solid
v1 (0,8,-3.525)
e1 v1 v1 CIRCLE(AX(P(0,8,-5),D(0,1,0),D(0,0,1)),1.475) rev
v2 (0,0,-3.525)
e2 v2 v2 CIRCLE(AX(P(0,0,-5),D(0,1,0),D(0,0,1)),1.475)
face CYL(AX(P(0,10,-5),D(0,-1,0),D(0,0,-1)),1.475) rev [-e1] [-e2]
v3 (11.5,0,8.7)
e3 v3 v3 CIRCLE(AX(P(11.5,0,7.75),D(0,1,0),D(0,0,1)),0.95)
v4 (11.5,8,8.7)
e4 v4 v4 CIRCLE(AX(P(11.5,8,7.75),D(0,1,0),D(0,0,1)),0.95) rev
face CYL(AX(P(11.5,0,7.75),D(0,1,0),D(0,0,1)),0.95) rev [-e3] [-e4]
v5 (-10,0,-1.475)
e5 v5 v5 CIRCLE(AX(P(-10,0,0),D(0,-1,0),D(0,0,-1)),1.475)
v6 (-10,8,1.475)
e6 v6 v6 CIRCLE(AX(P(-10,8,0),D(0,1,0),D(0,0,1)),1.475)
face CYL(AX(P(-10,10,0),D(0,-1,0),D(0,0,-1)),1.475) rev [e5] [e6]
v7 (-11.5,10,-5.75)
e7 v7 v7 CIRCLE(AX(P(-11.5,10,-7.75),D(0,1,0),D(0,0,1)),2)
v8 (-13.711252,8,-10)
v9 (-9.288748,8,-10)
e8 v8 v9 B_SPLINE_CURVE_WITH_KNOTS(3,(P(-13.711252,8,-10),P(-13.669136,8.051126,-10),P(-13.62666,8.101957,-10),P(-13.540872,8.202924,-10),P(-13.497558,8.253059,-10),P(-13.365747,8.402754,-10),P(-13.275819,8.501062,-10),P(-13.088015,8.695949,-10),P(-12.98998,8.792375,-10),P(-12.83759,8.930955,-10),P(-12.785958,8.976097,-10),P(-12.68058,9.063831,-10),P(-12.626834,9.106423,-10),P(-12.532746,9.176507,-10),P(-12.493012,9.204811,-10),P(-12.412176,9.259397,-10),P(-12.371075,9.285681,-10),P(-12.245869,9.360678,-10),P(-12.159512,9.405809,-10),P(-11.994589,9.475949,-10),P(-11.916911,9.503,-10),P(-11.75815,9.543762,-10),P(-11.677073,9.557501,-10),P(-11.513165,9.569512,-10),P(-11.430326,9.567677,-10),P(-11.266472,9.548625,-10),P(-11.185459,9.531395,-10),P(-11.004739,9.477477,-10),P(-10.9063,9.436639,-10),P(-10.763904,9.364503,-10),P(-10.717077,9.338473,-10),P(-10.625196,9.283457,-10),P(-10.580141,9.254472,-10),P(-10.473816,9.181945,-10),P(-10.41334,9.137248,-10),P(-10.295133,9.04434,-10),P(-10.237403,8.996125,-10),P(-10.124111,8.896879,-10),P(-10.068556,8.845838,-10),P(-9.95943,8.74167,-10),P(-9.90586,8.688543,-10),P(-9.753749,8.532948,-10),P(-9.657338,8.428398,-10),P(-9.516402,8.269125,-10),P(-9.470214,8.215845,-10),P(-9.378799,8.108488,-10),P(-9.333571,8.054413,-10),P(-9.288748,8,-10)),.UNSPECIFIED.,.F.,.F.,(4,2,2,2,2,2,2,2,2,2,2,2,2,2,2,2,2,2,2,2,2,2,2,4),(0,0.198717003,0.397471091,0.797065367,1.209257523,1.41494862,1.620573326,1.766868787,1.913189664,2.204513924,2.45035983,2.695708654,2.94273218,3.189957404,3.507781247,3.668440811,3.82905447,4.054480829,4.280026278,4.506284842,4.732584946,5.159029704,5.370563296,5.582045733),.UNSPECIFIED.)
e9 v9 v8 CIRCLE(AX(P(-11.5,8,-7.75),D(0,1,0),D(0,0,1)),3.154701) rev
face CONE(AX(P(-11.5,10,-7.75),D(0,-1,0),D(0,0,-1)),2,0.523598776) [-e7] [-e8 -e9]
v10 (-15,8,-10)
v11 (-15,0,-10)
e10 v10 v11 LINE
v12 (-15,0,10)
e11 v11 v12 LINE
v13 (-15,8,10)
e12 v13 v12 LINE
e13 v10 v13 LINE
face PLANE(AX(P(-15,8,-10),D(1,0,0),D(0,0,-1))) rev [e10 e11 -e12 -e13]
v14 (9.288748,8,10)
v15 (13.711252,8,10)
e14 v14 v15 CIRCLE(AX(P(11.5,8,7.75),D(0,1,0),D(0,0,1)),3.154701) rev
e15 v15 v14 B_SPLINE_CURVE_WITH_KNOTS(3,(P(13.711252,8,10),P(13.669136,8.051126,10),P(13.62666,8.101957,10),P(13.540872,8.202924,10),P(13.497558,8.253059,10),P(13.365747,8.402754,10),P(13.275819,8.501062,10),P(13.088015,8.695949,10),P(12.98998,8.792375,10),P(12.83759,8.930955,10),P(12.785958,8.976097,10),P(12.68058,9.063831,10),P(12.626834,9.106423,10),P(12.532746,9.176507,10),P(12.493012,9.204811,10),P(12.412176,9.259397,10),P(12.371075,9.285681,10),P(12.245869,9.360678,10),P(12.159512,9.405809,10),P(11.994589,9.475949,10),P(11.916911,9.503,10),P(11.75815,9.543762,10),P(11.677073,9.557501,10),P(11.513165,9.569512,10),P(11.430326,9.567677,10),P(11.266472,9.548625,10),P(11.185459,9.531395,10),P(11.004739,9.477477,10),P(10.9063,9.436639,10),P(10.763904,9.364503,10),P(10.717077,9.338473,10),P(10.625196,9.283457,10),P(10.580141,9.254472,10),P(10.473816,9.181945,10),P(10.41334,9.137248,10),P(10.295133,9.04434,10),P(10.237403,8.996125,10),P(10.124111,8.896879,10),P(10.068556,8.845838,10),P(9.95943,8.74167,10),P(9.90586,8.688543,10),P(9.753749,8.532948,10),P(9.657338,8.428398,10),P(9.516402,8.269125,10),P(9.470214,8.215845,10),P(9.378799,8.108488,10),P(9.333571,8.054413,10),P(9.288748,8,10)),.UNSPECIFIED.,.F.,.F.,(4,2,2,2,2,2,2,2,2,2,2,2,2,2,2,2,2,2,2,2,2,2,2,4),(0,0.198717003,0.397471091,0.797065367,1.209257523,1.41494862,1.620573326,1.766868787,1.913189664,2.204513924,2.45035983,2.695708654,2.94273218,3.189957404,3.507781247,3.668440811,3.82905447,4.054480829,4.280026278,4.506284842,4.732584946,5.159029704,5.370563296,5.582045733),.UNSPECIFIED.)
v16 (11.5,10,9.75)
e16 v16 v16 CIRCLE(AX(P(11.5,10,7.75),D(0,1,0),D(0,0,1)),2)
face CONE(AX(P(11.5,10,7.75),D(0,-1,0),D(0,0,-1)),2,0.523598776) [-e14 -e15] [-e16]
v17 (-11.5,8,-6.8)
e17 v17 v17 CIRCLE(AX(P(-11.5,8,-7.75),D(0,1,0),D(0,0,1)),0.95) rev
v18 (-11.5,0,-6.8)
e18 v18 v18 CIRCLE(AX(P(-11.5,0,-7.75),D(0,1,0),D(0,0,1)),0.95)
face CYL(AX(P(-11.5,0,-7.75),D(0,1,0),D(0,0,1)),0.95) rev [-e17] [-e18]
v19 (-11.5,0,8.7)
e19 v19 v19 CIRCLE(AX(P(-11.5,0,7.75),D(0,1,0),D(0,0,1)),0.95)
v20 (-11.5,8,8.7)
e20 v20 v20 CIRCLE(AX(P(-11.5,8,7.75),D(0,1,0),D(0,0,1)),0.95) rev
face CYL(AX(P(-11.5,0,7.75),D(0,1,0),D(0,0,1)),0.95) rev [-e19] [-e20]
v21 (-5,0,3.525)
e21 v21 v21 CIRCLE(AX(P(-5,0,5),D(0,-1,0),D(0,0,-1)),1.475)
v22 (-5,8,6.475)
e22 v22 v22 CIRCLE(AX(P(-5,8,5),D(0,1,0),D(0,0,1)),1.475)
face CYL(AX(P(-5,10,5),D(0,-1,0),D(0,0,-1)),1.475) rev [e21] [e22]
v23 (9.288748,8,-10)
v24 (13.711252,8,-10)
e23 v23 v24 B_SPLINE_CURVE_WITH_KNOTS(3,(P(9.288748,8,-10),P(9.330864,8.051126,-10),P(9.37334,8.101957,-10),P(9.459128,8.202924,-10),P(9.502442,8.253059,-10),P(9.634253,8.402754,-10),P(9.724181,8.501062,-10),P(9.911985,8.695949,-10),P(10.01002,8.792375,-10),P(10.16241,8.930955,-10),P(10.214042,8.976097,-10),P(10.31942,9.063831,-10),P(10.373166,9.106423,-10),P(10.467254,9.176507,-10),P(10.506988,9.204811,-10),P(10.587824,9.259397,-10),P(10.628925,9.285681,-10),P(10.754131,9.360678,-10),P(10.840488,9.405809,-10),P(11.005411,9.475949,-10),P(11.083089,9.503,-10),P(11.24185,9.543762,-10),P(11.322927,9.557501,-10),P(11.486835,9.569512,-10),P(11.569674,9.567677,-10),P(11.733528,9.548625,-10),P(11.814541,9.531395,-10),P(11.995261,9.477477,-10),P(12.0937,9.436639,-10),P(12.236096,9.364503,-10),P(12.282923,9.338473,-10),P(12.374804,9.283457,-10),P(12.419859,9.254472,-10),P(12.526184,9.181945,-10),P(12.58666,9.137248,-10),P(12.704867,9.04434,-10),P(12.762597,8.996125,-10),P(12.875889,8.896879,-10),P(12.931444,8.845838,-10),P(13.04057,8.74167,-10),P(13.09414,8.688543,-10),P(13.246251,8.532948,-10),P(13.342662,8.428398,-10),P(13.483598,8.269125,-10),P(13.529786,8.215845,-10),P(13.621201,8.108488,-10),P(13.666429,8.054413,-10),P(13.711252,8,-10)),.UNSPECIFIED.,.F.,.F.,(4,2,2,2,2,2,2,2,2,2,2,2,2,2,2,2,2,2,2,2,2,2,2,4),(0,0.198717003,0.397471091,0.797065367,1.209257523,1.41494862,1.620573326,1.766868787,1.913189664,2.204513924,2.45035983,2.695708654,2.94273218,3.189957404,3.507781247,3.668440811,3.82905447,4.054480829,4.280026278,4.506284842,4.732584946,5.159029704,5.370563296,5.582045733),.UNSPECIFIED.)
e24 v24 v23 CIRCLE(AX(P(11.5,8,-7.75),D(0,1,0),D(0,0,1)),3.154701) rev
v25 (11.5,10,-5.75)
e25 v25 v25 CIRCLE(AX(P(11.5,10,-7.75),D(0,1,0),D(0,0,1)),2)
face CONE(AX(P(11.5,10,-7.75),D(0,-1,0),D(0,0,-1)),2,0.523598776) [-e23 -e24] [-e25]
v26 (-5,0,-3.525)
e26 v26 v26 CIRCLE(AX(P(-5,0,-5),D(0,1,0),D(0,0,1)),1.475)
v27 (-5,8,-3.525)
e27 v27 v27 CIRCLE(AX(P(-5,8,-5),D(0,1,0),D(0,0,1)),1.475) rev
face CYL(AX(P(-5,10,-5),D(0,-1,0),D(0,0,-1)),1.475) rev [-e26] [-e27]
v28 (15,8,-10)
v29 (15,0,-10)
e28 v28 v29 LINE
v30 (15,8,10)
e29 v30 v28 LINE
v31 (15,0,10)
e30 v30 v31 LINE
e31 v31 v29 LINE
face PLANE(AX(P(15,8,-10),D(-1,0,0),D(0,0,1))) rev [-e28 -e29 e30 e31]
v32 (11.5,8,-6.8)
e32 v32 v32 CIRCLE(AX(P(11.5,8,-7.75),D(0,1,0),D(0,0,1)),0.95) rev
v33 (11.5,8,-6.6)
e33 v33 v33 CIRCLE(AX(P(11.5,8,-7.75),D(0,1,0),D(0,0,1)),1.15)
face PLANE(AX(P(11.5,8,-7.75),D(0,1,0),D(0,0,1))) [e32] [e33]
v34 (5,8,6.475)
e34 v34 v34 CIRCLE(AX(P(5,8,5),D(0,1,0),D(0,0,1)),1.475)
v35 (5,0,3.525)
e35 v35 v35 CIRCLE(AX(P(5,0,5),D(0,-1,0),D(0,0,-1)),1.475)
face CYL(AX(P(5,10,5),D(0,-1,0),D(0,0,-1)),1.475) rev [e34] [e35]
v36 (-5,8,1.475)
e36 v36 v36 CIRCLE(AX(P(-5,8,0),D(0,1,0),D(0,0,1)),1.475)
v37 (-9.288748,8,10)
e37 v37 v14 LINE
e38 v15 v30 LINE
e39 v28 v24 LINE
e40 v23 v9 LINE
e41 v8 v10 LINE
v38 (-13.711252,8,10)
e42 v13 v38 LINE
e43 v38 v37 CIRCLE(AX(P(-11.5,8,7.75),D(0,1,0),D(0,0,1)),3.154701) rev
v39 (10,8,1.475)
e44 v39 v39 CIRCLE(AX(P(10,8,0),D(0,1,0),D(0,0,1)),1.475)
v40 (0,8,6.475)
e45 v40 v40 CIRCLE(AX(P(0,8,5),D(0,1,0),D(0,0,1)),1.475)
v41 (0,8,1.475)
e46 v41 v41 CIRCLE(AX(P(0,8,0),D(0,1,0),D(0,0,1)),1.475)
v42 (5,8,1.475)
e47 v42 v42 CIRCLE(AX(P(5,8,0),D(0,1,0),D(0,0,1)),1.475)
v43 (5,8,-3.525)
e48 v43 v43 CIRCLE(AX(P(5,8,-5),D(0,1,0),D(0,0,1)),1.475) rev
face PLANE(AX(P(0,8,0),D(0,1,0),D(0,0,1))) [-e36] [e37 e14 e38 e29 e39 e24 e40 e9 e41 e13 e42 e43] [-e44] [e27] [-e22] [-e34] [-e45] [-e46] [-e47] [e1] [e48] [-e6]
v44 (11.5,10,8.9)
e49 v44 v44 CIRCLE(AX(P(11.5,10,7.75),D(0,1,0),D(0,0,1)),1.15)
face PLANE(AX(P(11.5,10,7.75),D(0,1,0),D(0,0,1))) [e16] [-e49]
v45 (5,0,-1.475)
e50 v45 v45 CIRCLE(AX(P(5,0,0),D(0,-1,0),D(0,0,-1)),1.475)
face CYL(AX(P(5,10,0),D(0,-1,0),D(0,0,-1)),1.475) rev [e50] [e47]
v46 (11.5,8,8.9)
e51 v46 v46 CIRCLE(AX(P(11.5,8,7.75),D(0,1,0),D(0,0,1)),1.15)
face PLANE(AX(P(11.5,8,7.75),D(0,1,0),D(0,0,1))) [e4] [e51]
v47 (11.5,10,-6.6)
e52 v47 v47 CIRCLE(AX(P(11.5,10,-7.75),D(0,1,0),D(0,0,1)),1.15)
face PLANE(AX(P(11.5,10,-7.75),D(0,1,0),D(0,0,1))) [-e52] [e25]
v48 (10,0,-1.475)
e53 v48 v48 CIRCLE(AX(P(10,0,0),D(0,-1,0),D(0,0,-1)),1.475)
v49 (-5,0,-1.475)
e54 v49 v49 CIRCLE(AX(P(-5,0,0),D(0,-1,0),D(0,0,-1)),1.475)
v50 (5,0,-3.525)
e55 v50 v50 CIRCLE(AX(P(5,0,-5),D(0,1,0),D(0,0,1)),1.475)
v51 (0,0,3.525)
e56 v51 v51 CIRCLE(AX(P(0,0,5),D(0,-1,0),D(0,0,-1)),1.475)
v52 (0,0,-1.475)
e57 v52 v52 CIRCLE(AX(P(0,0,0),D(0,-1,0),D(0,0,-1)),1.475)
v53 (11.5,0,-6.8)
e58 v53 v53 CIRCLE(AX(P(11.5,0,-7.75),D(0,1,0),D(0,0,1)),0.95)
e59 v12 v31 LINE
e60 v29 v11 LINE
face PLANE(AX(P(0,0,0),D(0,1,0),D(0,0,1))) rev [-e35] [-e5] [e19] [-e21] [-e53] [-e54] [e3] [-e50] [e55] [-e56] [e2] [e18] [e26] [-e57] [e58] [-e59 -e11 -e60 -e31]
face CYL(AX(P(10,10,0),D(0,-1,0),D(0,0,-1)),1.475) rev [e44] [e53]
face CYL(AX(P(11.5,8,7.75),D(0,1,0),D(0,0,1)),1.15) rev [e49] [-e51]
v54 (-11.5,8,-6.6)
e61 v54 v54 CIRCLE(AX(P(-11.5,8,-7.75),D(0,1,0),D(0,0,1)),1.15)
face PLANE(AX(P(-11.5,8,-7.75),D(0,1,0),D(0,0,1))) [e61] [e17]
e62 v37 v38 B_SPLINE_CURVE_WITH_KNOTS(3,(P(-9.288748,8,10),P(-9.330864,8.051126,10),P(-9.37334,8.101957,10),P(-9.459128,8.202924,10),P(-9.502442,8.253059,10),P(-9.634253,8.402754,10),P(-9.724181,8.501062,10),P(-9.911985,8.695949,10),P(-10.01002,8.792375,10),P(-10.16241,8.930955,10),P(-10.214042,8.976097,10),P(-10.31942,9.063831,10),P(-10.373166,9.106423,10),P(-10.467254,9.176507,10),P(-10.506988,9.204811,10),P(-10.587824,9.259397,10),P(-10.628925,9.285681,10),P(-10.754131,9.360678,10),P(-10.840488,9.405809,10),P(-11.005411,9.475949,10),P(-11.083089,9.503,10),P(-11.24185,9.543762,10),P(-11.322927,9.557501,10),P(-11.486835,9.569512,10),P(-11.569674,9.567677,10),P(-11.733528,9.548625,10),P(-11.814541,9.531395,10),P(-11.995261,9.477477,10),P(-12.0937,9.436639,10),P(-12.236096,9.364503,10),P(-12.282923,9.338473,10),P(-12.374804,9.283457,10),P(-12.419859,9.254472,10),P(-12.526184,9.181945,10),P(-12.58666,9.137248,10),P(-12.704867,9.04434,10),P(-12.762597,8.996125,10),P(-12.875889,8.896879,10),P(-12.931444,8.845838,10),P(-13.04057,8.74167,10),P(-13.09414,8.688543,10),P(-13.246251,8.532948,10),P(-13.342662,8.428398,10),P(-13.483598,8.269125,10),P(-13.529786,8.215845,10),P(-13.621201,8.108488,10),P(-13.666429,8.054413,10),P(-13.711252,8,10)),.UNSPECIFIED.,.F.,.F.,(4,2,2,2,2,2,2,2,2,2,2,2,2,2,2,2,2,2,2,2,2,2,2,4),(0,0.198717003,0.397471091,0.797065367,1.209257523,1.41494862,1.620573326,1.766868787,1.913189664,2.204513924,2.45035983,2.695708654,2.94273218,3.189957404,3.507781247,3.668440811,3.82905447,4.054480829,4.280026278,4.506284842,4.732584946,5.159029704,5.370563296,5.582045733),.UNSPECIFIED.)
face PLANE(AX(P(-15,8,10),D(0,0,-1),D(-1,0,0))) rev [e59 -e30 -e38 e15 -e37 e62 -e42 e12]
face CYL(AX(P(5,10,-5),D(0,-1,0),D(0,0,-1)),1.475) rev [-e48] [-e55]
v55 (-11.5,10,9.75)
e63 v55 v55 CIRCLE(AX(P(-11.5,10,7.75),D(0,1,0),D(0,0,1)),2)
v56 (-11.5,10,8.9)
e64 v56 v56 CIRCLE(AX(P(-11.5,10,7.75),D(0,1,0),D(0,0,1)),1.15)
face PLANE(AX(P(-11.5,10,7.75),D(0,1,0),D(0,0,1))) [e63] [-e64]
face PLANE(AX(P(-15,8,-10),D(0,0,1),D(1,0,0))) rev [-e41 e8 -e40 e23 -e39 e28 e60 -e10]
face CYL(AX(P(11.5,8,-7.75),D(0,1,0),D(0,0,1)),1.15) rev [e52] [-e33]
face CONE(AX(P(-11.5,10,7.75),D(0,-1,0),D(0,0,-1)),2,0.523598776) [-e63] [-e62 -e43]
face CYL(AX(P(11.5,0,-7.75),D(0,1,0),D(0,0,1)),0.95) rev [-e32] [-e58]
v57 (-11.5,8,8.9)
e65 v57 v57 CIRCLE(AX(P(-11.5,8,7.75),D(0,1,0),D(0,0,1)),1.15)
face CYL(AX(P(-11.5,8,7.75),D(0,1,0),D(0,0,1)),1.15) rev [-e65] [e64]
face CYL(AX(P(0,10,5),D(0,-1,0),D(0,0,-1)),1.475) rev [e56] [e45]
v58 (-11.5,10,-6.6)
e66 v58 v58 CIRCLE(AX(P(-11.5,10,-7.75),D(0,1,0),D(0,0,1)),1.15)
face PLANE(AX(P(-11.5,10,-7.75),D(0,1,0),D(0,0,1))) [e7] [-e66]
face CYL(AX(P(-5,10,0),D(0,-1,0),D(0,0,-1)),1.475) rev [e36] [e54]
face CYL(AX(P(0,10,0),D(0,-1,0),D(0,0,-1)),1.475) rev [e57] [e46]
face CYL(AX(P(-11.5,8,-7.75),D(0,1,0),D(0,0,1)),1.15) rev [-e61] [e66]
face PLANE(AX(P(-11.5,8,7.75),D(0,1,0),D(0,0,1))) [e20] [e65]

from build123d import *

# Parameters (mm, degrees)
SKETCH1_W               = 30
SKETCH1_H               = 20
BOSS_EXTRUDE1_DEPTH     = 8
SKETCH2_R               = 0.95
CUT_EXTRUDE1_DEPTH      = 20.723082923
BOSS_EXTRUDE2_START     = 2
SKETCH3_R               = 2
SKETCH3_R_2             = 0.95
BOSS_EXTRUDE2_DEPTH     = 2
CHAMFER1_SIZE           = 1.154700538
CHAMFER1_SIZE_2         = 2
SKETCH4_R               = 1.475
CUT_EXTRUDE2_DEPTH      = 21.615528128
LPATTERN1_COUNT         = 5
LPATTERN1_PITCH         = 5
LPATTERN1_COUNT_DIR2    = 2
LPATTERN1_PITCH_DIR2    = 5
MIRROR1_COPY_1_SKETCH_R = 1.475
MIRROR1_COPY_1_DEPTH    = 21.615528128
MIRROR1_COPY_2_SKETCH_R = 1.475
MIRROR1_COPY_2_DEPTH    = 21.615528128
MIRROR1_COPY_3_SKETCH_R = 1.475
MIRROR1_COPY_3_DEPTH    = 21.615528128
MIRROR1_COPY_4_SKETCH_R = 1.475
MIRROR1_COPY_4_DEPTH    = 21.615528128
MIRROR1_COPY_5_SKETCH_R = 1.475
MIRROR1_COPY_5_DEPTH    = 21.615528128
MIRROR1_COPY_6_SKETCH_R = 1.475
MIRROR1_COPY_6_DEPTH    = 21.615528128
MIRROR1_COPY_7_SKETCH_R = 1.475
MIRROR1_COPY_7_DEPTH    = 21.615528128
MIRROR1_COPY_8_SKETCH_R = 1.475
MIRROR1_COPY_8_DEPTH    = 21.615528128
SKETCH5_R               = 1.15
CUT_EXTRUDE3_DEPTH      = 2


with BuildPart() as part:
    # Sketch1 → Boss-Extrude1 (new body)
    with BuildSketch(Plane(origin=(0, 0, 0), x_dir=(1, 0, 0), z_dir=(0, 1, 0))):
        Rectangle(SKETCH1_W, SKETCH1_H)
    extrude(amount=BOSS_EXTRUDE1_DEPTH)

    # Sketch2 → Cut-Extrude1 (cut, through all)
    with BuildSketch(Plane(origin=(0, 8, 0), x_dir=(1, 0, 0), z_dir=(0, 1, 0))):
        with Locations(Location((-11.5, 7.75, 0), (0, 0, 270))):
            Circle(SKETCH2_R)
        with Locations(Location((-11.5, -7.75, 0), (0, 0, 270))):
            Circle(SKETCH2_R)
        with Locations(Location((11.5, -7.75, 0), (0, 0, 270))):
            Circle(SKETCH2_R)
        with Locations(Location((11.5, 7.75, 0), (0, 0, 270))):
            Circle(SKETCH2_R)
    extrude(amount=-CUT_EXTRUDE1_DEPTH, mode=Mode.SUBTRACT)

    # Sketch3 → Boss-Extrude2 (add)
    # profile 1 of 4: a face of its own
    with BuildSketch(Plane(origin=(0, 8, 0), x_dir=(1, 0, 0), z_dir=(0, 1, 0)).offset(BOSS_EXTRUDE2_START)):
        with Locations(Location((-11.5, -7.75, 0), (0, 0, 270))):
            Circle(SKETCH3_R)
        with Locations(Location((-11.5, -7.75, 0), (0, 0, 270))):
            Circle(SKETCH3_R_2, mode=Mode.SUBTRACT)
    # profile 2 of 4: a face of its own
    with BuildSketch(Plane(origin=(0, 8, 0), x_dir=(1, 0, 0), z_dir=(0, 1, 0)).offset(BOSS_EXTRUDE2_START)):
        with Locations(Location((-11.5, 7.75, 0), (0, 0, 270))):
            Circle(SKETCH3_R)
        with Locations(Location((-11.5, 7.75, 0), (0, 0, 270))):
            Circle(SKETCH3_R_2, mode=Mode.SUBTRACT)
    # profile 3 of 4: a face of its own
    with BuildSketch(Plane(origin=(0, 8, 0), x_dir=(1, 0, 0), z_dir=(0, 1, 0)).offset(BOSS_EXTRUDE2_START)):
        with Locations(Location((11.5, 7.75, 0), (0, 0, 270))):
            Circle(SKETCH3_R)
        with Locations(Location((11.5, 7.75, 0), (0, 0, 270))):
            Circle(SKETCH3_R_2, mode=Mode.SUBTRACT)
    # profile 4 of 4: a face of its own
    with BuildSketch(Plane(origin=(0, 8, 0), x_dir=(1, 0, 0), z_dir=(0, 1, 0)).offset(BOSS_EXTRUDE2_START)):
        with Locations(Location((11.5, -7.75, 0), (0, 0, 270))):
            Circle(SKETCH3_R)
        with Locations(Location((11.5, -7.75, 0), (0, 0, 270))):
            Circle(SKETCH3_R_2, mode=Mode.SUBTRACT)
    extrude(amount=-BOSS_EXTRUDE2_DEPTH)

    # Chamfer1
    # the kernel refuses this chamfer: 2, 1.154700538 mm, written as the material it adds along each edge
    with BuildSketch(Plane(origin=(11.5, 8, -7.75), x_dir=(0, 0, 1), z_dir=(-1, 0, 0))) as chamfer1_piece_1_section:
        Polygon((2 + CHAMFER1_SIZE, 0), (2, CHAMFER1_SIZE_2), (2, 0), align=None)
    chamfer1_piece_1 = revolve(axis=Axis((11.5, 8, -7.75), (0, 1, 0)), mode=Mode.PRIVATE)
    chamfer1_piece_1 = split(chamfer1_piece_1, bisect_by=Plane(origin=(14.074735909, 8.26258781, -10), z_dir=(0, 0, 1)), keep=Keep.TOP, mode=Mode.PRIVATE)
    chamfer1_piece_1 = split(chamfer1_piece_1, bisect_by=Plane(origin=(14.074735909, 10, -6.26347553), z_dir=(0, -1, 0)), keep=Keep.TOP, mode=Mode.PRIVATE)
    add(chamfer1_piece_1)
    with BuildSketch(Plane(origin=(11.5, 8, 7.75), x_dir=(0, 0, 1), z_dir=(-1, 0, 0))) as chamfer1_piece_2_section:
        Polygon((2 + CHAMFER1_SIZE, 0), (2, CHAMFER1_SIZE_2), (2, 0), align=None)
    chamfer1_piece_2 = revolve(axis=Axis((11.5, 8, 7.75), (0, 1, 0)), mode=Mode.PRIVATE)
    chamfer1_piece_2 = split(chamfer1_piece_2, bisect_by=Plane(origin=(11.5, 8.952348486, 10), z_dir=(0, 0, -1)), keep=Keep.TOP, mode=Mode.PRIVATE)
    chamfer1_piece_2 = split(chamfer1_piece_2, bisect_by=Plane(origin=(11.5, 10, 5.175184574), z_dir=(0, -1, 0)), keep=Keep.TOP, mode=Mode.PRIVATE)
    add(chamfer1_piece_2)
    with BuildSketch(Plane(origin=(-11.5, 8, -7.75), x_dir=(0, 0, 1), z_dir=(-1, 0, 0))) as chamfer1_piece_3_section:
        Polygon((2 + CHAMFER1_SIZE, 0), (2, CHAMFER1_SIZE_2), (2, 0), align=None)
    chamfer1_piece_3 = revolve(axis=Axis((-11.5, 8, -7.75), (0, 1, 0)), mode=Mode.PRIVATE)
    chamfer1_piece_3 = split(chamfer1_piece_3, bisect_by=Plane(origin=(-8.925264091, 8.26258781, -10), z_dir=(0, 0, 1)), keep=Keep.TOP, mode=Mode.PRIVATE)
    chamfer1_piece_3 = split(chamfer1_piece_3, bisect_by=Plane(origin=(-8.925264091, 10, -6.26347553), z_dir=(0, -1, 0)), keep=Keep.TOP, mode=Mode.PRIVATE)
    add(chamfer1_piece_3)
    with BuildSketch(Plane(origin=(-11.5, 8, 7.75), x_dir=(0, 0, 1), z_dir=(-1, 0, 0))) as chamfer1_piece_4_section:
        Polygon((2 + CHAMFER1_SIZE, 0), (2, CHAMFER1_SIZE_2), (2, 0), align=None)
    chamfer1_piece_4 = revolve(axis=Axis((-11.5, 8, 7.75), (0, 1, 0)), mode=Mode.PRIVATE)
    chamfer1_piece_4 = split(chamfer1_piece_4, bisect_by=Plane(origin=(-11.5, 8.952348486, 10), z_dir=(0, 0, -1)), keep=Keep.TOP, mode=Mode.PRIVATE)
    chamfer1_piece_4 = split(chamfer1_piece_4, bisect_by=Plane(origin=(-11.5, 10, 5.175184573), z_dir=(0, -1, 0)), keep=Keep.TOP, mode=Mode.PRIVATE)
    add(chamfer1_piece_4)

    # Sketch4 → Cut-Extrude2 (cut, through all)
    with BuildSketch(Plane.XZ):
        with Locations(Location((-10, 0, 0), (0, 0, 270))):
            Circle(SKETCH4_R)
    cut_extrude2 = extrude(amount=-CUT_EXTRUDE2_DEPTH, mode=Mode.SUBTRACT)

    # LPattern1: Cut-Extrude2 5 × 2, 2 skipped
    with Locations(*[(i * LPATTERN1_PITCH, 0, j * LPATTERN1_PITCH_DIR2) for i in range(LPATTERN1_COUNT) for j in range(LPATTERN1_COUNT_DIR2) if (i, j) not in ((0, 0), (0, 1), (4, 1))]):
        add(cut_extrude2, mode=Mode.SUBTRACT)

    # Mirror1 copy 1 sketch → Mirror1 copy 1 (cut, through all)
    with BuildSketch(Plane(origin=(5, 0, 0), x_dir=(1, 0, 0), z_dir=(0, -1, 0))):
        with Locations((-10, 0)):
            Circle(MIRROR1_COPY_1_SKETCH_R)
    extrude(amount=-MIRROR1_COPY_1_DEPTH, mode=Mode.SUBTRACT)

    # Mirror1 copy 2 sketch → Mirror1 copy 2 (cut, through all)
    with BuildSketch(Plane(origin=(5, 0, -5), x_dir=(1, 0, 0), z_dir=(0, -1, 0))):
        with Locations((-10, 0)):
            Circle(MIRROR1_COPY_2_SKETCH_R)
    extrude(amount=-MIRROR1_COPY_2_DEPTH, mode=Mode.SUBTRACT)

    # Mirror1 copy 3 sketch → Mirror1 copy 3 (cut, through all)
    with BuildSketch(Plane(origin=(10, 0, 0), x_dir=(1, 0, 0), z_dir=(0, -1, 0))):
        with Locations((-10, 0)):
            Circle(MIRROR1_COPY_3_SKETCH_R)
    extrude(amount=-MIRROR1_COPY_3_DEPTH, mode=Mode.SUBTRACT)

    # Mirror1 copy 4 sketch → Mirror1 copy 4 (cut, through all)
    with BuildSketch(Plane(origin=(10, 0, -5), x_dir=(1, 0, 0), z_dir=(0, -1, 0))):
        with Locations((-10, 0)):
            Circle(MIRROR1_COPY_4_SKETCH_R)
    extrude(amount=-MIRROR1_COPY_4_DEPTH, mode=Mode.SUBTRACT)

    # Mirror1 copy 5 sketch → Mirror1 copy 5 (cut, through all)
    with BuildSketch(Plane(origin=(15, 0, 0), x_dir=(1, 0, 0), z_dir=(0, -1, 0))):
        with Locations((-10, 0)):
            Circle(MIRROR1_COPY_5_SKETCH_R)
    extrude(amount=-MIRROR1_COPY_5_DEPTH, mode=Mode.SUBTRACT)

    # Mirror1 copy 6 sketch → Mirror1 copy 6 (cut, through all)
    with BuildSketch(Plane(origin=(15, 0, -5), x_dir=(1, 0, 0), z_dir=(0, -1, 0))):
        with Locations((-10, 0)):
            Circle(MIRROR1_COPY_6_SKETCH_R)
    extrude(amount=-MIRROR1_COPY_6_DEPTH, mode=Mode.SUBTRACT)

    # Mirror1 copy 7 sketch → Mirror1 copy 7 (cut, through all)
    with BuildSketch(Plane(origin=(20, 0, 0), x_dir=(1, 0, 0), z_dir=(0, -1, 0))):
        with Locations((-10, 0)):
            Circle(MIRROR1_COPY_7_SKETCH_R)
    extrude(amount=-MIRROR1_COPY_7_DEPTH, mode=Mode.SUBTRACT)

    # Mirror1 copy 8 sketch → Mirror1 copy 8 (cut, through all)
    with BuildSketch(Plane.XZ):
        with Locations((-10, 0)):
            Circle(MIRROR1_COPY_8_SKETCH_R)
    extrude(amount=-MIRROR1_COPY_8_DEPTH, mode=Mode.SUBTRACT)

    # Sketch5 → Cut-Extrude3 (cut)
    with BuildSketch(Plane(origin=(0, 10, 0), x_dir=(1, 0, 0), z_dir=(0, 1, 0))):
        with Locations(Location((-11.5, 7.75, 0), (0, 0, 270))):
            Circle(SKETCH5_R)
        with Locations(Location((-11.5, -7.75, 0), (0, 0, 270))):
            Circle(SKETCH5_R)
        with Locations(Location((11.5, 7.75, 0), (0, 0, 270))):
            Circle(SKETCH5_R)
        with Locations(Location((11.5, -7.75, 0), (0, 0, 270))):
            Circle(SKETCH5_R)
    extrude(amount=-CUT_EXTRUDE3_DEPTH, mode=Mode.SUBTRACT)


solid = part.part
